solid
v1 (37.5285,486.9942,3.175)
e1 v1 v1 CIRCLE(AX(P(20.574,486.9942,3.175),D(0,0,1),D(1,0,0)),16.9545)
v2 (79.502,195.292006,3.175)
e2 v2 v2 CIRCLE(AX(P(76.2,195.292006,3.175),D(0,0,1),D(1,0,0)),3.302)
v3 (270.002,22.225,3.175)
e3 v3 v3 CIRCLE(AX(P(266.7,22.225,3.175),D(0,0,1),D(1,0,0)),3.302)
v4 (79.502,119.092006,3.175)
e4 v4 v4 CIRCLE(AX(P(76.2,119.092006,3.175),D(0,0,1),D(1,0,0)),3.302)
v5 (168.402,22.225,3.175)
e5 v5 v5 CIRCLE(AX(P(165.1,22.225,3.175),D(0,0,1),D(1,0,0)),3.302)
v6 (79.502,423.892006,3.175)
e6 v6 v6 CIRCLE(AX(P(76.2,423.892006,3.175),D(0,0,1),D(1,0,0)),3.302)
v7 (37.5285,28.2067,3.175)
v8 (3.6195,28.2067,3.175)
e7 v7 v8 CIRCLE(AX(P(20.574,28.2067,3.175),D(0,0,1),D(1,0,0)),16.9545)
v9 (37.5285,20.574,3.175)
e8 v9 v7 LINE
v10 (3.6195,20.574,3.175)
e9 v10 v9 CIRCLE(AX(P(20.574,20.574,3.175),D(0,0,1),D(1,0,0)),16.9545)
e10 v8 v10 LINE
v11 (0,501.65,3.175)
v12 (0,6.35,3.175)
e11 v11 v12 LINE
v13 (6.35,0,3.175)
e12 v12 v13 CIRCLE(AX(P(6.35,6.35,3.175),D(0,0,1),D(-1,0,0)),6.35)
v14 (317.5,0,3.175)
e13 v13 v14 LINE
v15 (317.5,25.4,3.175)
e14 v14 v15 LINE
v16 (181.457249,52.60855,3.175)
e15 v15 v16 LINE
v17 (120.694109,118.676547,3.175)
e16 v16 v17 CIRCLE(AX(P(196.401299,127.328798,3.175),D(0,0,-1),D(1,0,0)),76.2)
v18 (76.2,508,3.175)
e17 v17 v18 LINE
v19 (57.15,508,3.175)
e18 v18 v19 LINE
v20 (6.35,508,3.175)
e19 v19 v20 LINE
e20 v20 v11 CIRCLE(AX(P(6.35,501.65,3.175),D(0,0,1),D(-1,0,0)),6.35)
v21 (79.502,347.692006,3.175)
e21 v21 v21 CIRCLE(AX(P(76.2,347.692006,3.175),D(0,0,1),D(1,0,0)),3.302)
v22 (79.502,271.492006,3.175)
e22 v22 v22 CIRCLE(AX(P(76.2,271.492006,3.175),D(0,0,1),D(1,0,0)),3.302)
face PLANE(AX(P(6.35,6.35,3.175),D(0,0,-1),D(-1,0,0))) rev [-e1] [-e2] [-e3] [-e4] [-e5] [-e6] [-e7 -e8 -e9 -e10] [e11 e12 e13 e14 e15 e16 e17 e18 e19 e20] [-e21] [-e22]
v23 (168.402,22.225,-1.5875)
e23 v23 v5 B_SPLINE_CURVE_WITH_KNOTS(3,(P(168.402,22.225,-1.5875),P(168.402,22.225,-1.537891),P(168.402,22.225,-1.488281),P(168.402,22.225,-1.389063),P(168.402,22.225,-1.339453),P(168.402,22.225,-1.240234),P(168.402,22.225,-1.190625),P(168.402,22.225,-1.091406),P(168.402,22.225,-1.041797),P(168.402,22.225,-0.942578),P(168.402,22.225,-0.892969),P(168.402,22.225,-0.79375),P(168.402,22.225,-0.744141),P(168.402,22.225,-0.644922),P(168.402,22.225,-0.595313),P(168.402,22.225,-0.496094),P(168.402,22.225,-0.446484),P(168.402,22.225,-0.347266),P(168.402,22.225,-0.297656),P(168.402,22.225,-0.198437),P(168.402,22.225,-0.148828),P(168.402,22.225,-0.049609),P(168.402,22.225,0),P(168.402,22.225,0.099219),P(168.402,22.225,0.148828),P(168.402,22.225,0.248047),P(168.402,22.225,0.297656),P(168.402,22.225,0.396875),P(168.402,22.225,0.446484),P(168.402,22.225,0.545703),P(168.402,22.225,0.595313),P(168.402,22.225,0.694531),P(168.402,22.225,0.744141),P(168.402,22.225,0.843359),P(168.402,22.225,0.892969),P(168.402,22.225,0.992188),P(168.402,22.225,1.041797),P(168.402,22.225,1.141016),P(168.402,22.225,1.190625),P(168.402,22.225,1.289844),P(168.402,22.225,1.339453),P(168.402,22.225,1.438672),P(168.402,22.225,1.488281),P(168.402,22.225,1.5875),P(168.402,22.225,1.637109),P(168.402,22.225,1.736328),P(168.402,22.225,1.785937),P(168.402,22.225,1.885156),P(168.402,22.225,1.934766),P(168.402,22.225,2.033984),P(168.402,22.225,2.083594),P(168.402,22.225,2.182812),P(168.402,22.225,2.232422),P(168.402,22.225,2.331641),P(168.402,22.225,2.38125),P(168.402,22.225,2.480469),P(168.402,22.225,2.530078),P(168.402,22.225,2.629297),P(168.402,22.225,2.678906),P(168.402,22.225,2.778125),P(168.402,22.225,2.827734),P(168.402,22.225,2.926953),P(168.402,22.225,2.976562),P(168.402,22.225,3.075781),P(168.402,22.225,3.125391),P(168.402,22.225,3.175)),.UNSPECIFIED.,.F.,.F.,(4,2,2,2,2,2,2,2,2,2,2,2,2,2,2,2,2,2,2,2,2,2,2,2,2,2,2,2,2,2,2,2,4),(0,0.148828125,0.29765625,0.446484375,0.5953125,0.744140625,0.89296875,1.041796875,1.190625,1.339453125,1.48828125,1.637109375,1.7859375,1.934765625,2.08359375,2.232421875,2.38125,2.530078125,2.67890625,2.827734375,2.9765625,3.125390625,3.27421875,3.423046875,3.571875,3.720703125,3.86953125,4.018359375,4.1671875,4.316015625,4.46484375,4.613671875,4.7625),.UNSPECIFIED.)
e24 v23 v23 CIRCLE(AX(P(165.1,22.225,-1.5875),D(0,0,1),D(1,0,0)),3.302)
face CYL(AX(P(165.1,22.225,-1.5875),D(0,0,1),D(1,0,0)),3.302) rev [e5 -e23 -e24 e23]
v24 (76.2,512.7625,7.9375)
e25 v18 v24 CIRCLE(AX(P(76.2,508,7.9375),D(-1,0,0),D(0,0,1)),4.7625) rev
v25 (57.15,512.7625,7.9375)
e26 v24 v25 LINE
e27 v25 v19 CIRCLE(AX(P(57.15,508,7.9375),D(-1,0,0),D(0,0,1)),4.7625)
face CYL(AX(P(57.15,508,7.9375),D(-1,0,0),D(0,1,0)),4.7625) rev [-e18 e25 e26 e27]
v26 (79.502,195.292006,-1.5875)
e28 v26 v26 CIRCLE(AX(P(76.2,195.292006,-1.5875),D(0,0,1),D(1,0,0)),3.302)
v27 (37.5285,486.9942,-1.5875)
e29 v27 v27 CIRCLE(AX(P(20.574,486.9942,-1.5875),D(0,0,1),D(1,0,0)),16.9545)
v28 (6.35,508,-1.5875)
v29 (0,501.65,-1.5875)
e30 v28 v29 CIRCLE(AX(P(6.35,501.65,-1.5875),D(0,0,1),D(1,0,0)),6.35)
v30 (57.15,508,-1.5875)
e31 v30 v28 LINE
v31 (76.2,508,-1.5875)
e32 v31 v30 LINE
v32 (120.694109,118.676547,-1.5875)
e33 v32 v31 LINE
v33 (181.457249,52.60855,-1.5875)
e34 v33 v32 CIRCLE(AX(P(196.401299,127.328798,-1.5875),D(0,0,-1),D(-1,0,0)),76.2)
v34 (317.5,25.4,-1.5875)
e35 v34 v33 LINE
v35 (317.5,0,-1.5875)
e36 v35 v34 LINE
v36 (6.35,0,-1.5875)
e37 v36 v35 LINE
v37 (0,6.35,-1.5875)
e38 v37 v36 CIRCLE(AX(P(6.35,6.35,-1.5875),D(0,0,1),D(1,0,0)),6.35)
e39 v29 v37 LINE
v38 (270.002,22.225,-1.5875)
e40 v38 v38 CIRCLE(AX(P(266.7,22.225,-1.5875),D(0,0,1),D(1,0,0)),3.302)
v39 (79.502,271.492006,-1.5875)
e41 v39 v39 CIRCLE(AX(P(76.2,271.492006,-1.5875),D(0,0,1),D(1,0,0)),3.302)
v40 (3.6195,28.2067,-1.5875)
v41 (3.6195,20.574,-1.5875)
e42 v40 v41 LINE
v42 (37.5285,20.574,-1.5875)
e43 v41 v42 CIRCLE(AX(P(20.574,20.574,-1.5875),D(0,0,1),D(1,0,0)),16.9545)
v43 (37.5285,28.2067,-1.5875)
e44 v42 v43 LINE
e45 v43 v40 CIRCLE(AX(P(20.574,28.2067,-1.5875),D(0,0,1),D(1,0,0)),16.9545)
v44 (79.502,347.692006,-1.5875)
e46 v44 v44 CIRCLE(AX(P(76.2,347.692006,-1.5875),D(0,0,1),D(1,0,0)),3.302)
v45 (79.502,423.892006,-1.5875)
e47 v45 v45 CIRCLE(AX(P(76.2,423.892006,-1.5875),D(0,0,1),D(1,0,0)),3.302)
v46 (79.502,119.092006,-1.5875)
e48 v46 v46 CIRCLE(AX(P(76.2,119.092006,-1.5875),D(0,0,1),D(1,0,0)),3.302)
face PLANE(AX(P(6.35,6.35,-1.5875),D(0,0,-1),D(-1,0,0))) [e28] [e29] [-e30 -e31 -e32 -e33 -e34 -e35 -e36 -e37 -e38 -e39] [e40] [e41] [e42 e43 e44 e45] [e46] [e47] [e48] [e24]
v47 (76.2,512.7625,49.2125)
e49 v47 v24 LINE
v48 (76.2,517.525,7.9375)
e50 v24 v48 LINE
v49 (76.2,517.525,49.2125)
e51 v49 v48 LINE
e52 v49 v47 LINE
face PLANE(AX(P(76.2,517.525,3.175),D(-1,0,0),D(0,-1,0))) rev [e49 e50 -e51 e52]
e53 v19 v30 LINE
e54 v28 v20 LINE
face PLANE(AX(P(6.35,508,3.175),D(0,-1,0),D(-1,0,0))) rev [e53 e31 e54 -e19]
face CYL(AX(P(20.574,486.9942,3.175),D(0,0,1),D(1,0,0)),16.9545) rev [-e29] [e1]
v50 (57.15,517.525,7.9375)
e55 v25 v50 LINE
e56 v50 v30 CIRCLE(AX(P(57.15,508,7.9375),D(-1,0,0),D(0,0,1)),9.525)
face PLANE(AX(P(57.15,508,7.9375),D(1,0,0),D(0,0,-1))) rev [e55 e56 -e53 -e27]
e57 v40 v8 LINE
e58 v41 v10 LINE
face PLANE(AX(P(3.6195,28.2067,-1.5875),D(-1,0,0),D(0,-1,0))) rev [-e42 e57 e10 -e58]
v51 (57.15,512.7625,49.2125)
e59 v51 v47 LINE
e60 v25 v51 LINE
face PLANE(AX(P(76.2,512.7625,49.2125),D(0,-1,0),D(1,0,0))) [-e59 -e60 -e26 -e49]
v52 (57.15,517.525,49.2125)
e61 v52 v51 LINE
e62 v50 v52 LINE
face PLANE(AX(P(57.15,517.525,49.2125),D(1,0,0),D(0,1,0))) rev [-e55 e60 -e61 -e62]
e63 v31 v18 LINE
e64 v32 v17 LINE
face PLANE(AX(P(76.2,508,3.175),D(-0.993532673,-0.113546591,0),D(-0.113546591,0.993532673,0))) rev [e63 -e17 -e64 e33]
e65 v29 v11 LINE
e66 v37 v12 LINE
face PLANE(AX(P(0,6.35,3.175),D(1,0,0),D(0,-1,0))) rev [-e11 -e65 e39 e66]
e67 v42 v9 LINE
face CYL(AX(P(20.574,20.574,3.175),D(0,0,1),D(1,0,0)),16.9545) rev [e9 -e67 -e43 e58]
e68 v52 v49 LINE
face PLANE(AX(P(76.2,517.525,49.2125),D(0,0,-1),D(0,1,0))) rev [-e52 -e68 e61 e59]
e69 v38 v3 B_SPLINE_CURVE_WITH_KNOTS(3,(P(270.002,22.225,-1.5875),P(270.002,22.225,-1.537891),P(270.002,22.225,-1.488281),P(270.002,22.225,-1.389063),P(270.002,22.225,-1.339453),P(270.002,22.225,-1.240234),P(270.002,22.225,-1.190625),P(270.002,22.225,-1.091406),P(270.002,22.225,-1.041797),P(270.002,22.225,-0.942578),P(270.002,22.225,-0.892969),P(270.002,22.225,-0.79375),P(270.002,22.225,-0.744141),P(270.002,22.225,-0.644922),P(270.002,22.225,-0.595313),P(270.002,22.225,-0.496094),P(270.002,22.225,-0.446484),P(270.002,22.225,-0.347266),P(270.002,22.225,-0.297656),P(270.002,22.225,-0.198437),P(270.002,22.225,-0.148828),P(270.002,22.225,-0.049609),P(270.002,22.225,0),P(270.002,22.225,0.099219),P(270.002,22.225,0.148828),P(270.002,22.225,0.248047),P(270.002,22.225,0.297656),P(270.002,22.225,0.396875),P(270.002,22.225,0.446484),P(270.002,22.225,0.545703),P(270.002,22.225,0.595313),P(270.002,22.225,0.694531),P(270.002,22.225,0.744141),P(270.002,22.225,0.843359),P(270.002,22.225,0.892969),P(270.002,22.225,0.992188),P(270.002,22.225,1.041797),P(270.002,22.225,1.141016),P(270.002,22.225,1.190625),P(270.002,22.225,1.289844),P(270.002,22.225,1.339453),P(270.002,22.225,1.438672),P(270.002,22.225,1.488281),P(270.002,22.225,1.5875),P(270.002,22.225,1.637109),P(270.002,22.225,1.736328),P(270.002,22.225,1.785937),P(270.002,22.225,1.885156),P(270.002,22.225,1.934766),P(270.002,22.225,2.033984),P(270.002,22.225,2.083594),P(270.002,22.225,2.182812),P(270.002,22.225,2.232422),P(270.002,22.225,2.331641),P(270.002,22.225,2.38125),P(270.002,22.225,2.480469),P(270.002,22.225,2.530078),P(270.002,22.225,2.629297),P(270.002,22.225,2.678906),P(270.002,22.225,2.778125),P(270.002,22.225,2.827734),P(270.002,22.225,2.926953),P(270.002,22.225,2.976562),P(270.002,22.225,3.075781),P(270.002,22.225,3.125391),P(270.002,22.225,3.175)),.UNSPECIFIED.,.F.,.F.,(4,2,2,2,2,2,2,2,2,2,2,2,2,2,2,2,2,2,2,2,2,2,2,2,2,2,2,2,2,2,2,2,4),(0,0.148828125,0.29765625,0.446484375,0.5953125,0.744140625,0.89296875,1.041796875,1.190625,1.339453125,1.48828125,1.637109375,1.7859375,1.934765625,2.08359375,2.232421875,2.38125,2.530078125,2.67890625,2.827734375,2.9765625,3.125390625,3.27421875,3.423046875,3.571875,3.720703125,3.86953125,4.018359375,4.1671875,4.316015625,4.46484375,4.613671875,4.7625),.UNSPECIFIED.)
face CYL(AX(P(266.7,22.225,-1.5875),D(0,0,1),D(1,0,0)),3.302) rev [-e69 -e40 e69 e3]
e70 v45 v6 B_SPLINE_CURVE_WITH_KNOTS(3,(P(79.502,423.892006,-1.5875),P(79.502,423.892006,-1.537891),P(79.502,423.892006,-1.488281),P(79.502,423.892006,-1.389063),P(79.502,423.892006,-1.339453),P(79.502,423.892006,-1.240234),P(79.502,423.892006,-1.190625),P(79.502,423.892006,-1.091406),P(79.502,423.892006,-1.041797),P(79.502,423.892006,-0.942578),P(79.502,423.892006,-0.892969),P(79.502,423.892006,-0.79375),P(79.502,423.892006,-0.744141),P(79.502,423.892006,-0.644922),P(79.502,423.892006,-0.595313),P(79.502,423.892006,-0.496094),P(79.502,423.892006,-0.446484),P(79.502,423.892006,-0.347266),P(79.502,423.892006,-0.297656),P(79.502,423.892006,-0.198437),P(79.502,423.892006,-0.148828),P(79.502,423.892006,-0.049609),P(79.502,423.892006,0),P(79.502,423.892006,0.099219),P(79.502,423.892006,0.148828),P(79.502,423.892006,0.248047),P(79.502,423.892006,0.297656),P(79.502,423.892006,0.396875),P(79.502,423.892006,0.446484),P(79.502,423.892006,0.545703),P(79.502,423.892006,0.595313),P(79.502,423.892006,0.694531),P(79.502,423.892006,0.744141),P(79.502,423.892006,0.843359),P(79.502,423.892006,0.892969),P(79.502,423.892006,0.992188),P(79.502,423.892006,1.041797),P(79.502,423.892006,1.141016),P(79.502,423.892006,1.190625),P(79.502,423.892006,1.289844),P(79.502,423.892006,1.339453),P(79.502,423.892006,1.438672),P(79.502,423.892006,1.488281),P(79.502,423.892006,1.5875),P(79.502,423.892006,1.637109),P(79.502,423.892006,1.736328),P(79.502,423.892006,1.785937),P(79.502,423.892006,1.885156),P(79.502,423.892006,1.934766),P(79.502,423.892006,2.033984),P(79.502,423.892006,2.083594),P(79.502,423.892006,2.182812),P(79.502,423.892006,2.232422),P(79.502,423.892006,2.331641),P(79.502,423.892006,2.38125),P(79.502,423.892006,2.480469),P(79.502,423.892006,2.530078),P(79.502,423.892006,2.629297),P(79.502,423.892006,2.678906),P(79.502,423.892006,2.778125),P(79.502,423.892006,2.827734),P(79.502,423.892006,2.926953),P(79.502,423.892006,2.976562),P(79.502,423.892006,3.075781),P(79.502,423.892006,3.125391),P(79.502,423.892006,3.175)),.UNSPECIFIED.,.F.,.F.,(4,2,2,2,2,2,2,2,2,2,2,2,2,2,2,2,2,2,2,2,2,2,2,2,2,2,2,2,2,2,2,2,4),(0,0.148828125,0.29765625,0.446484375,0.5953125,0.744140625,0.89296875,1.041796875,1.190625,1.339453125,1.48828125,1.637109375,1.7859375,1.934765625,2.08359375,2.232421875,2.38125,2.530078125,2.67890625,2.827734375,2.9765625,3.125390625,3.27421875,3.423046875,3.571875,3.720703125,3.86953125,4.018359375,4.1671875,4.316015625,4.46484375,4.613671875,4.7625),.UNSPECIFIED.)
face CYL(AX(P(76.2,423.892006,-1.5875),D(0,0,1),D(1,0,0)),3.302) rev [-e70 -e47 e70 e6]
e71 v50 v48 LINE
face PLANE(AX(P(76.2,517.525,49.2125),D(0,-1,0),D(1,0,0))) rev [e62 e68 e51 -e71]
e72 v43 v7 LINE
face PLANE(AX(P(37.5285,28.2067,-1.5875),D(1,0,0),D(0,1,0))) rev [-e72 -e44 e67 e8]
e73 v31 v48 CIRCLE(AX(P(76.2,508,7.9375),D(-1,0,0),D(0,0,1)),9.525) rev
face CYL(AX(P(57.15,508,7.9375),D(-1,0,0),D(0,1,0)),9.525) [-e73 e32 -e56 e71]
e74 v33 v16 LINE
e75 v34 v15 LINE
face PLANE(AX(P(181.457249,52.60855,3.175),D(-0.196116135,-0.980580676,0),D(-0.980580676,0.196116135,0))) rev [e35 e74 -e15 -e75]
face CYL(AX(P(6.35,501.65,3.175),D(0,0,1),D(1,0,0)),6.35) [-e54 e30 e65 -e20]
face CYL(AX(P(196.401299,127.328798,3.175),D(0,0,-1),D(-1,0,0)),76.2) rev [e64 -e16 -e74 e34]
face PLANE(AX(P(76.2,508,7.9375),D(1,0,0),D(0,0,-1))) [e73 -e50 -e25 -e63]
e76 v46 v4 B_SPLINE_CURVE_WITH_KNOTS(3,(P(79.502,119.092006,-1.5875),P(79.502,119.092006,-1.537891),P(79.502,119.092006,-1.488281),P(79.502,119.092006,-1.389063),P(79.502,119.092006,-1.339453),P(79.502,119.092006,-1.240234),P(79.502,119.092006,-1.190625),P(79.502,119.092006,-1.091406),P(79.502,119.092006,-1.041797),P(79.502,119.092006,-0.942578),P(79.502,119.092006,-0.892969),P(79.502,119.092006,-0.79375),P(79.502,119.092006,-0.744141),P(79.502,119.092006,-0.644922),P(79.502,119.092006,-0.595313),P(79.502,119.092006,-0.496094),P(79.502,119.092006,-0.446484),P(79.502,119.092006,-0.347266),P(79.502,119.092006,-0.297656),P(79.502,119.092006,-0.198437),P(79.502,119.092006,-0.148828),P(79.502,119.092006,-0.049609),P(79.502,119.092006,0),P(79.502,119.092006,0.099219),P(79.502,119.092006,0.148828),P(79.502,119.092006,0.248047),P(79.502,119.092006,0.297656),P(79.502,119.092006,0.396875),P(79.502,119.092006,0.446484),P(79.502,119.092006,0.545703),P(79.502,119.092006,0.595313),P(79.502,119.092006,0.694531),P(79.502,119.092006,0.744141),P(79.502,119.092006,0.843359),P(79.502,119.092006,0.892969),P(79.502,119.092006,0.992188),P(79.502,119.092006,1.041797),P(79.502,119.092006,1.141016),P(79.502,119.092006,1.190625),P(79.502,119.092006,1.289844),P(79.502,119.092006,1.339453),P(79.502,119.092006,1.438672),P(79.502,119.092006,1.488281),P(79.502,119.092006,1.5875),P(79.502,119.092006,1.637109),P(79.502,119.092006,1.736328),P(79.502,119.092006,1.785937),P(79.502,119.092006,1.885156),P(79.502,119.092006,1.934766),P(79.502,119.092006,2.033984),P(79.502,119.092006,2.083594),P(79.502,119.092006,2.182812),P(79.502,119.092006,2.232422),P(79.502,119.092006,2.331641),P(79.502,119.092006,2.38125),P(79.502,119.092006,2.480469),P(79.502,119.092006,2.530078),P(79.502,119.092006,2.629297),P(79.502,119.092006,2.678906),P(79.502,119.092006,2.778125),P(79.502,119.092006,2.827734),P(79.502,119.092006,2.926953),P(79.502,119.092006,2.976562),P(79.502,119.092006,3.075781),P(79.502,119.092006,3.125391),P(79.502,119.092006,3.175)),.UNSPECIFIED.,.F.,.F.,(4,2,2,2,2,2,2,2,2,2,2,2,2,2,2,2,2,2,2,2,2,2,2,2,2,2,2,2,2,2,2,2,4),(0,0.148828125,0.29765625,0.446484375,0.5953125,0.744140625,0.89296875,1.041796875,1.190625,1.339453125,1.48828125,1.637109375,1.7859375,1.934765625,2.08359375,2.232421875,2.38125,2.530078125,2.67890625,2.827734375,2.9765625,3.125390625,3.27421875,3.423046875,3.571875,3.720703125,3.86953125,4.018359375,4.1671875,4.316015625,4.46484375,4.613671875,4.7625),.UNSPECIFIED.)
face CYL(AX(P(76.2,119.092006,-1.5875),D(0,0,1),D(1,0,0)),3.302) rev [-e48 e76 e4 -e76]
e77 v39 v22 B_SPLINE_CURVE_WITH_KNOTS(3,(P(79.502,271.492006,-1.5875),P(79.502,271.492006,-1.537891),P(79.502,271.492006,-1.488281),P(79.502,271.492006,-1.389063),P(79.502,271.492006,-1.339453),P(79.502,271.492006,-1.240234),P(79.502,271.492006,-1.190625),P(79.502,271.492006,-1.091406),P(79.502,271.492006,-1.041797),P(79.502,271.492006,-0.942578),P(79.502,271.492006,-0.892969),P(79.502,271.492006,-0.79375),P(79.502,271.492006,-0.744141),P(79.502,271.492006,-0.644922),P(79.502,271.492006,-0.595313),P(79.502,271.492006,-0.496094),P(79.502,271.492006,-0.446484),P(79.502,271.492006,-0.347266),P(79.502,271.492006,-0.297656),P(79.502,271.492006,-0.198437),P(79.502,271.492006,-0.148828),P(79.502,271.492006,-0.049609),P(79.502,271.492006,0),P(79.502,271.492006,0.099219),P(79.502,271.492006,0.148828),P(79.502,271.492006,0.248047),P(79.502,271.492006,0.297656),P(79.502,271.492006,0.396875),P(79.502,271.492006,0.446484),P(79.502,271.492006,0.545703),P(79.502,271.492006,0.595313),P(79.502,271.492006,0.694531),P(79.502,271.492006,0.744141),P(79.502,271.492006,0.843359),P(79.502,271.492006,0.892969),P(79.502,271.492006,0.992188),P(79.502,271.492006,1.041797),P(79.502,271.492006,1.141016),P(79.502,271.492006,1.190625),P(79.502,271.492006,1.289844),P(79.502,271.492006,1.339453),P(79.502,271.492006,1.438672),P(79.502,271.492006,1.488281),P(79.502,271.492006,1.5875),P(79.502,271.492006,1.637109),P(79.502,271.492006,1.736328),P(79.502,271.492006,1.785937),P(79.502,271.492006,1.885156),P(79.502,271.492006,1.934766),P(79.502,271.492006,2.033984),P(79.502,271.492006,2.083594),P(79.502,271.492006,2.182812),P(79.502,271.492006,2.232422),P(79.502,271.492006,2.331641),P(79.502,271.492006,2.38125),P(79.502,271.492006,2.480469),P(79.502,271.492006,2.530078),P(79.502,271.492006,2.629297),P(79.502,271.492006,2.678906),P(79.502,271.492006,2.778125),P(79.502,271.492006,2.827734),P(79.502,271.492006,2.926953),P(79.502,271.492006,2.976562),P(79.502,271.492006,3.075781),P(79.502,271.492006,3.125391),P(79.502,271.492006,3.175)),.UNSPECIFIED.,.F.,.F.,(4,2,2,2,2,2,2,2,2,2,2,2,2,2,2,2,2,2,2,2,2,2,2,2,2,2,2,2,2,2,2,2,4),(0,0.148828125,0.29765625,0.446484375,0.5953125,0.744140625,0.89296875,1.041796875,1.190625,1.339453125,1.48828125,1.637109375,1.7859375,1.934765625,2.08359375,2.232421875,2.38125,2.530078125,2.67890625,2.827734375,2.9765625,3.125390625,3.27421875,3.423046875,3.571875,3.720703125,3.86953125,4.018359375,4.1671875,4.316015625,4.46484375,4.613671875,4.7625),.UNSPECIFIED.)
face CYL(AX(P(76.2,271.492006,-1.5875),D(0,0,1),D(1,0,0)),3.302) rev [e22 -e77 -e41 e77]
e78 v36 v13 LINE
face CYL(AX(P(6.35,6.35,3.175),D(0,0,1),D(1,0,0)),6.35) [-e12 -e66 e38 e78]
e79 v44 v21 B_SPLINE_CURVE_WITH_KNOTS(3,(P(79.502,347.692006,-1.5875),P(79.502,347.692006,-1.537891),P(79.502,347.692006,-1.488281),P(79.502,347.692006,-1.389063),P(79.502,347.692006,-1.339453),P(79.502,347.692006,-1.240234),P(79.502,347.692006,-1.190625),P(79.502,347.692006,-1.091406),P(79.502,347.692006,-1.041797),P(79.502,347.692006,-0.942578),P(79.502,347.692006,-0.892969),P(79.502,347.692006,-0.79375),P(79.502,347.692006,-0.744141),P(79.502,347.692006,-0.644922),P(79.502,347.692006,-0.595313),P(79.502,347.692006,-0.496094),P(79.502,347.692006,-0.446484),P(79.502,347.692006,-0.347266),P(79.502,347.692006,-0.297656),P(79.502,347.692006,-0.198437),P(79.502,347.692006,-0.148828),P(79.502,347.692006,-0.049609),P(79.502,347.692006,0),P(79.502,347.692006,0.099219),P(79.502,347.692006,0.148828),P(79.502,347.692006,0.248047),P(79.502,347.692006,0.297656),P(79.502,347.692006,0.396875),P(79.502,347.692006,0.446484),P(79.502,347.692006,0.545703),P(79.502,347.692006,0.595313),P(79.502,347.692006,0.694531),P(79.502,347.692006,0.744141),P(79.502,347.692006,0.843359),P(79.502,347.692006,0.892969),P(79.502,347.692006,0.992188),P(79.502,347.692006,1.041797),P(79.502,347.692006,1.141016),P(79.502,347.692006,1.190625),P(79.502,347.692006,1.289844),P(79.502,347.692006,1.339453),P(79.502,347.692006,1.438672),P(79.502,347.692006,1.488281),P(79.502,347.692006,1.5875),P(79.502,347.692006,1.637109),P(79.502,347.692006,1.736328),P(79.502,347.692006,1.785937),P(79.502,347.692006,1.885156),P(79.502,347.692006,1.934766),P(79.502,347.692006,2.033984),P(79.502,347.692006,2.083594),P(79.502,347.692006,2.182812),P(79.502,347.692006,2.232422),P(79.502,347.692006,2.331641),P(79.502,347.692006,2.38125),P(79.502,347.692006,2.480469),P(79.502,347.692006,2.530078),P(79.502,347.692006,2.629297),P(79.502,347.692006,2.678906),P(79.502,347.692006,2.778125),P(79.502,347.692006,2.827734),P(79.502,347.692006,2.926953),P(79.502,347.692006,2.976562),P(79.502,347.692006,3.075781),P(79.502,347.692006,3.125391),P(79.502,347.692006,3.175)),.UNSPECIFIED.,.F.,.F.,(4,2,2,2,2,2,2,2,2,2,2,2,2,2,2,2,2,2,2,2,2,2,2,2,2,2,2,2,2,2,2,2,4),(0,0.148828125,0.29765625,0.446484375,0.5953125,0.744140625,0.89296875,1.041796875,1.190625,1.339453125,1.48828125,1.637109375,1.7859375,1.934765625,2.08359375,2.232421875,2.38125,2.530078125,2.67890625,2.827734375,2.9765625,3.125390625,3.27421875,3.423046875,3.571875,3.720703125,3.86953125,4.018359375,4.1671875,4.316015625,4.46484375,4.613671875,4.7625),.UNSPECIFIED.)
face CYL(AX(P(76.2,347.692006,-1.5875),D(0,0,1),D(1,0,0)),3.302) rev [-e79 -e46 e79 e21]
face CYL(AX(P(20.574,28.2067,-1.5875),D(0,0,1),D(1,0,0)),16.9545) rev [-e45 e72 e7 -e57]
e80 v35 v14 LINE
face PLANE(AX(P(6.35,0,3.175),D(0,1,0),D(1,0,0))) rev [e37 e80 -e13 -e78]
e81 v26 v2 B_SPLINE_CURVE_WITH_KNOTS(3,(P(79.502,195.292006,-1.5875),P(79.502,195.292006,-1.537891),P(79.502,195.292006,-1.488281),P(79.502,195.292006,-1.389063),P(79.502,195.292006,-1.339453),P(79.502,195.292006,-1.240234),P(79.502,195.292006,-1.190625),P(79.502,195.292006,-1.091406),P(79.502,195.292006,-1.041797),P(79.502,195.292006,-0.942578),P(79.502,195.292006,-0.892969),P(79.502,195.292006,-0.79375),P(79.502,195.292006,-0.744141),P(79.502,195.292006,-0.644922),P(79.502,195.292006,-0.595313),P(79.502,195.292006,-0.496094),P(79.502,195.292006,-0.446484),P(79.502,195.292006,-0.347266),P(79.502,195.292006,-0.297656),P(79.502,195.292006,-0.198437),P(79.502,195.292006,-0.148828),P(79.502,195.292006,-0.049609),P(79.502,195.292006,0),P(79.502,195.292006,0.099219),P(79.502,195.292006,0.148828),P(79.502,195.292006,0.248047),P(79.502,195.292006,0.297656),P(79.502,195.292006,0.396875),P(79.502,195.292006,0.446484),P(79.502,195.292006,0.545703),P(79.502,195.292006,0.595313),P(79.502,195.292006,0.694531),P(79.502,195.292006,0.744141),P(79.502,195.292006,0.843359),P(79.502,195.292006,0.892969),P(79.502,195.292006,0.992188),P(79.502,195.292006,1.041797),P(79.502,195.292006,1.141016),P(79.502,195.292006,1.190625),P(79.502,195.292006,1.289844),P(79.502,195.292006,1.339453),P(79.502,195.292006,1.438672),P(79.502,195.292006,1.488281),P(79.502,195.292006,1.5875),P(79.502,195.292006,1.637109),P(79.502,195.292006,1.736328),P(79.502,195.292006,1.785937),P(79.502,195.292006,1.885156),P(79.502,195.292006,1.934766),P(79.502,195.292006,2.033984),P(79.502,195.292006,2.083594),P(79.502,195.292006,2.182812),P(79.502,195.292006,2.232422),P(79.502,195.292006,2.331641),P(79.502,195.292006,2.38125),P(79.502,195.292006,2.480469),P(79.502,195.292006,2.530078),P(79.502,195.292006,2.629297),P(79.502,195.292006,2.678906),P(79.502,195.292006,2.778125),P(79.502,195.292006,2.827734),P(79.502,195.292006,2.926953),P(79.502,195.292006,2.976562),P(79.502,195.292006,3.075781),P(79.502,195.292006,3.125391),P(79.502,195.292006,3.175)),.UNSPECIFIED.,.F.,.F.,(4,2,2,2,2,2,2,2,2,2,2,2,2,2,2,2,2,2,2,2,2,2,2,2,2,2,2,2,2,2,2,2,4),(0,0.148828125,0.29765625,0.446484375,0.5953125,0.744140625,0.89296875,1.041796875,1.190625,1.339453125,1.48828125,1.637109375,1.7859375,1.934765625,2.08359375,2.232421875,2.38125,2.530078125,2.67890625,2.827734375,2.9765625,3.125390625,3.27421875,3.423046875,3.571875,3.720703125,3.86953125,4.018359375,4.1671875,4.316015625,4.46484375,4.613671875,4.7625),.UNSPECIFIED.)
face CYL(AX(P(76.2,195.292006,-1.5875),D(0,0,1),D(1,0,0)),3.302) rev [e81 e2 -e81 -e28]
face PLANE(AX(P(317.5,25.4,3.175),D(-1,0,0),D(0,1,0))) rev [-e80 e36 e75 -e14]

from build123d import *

# Parameters (mm, degrees)
BOSS_EXTRUDE1_DEPTH      = 3.175
SKETCH2_R                = 16.9545
CUT_EXTRUDE1_DEPTH       = 600.06621556
CONVERT_SOLID1_START     = -1.5875
CONVERT_SOLID1_OUTLINE_R = 16.9545
CONVERT_SOLID1_DEPTH     = 1.5875
EDGE_FLANGE3_DEPTH       = 19.05
SKETCH17_R               = 3.302
CUT_EXTRUDE4_DEPTH       = 609.89886437
CUT_EXTRUDE5_DEPTH       = 609.89886437
SKETCH19_R               = 3.302
CUT_EXTRUDE6_DEPTH       = 610.147146247


# Read off the part's stored shape, not the designer's step: Convert-Solid1
# Sheet-metal steps are written as plain solids
with BuildPart() as part:
    # Sketch1 → Boss-Extrude1 (new body)
    with BuildSketch(Plane.XY):
        with BuildLine():
            Line((6.35, 0), (317.5, 0))
            Line((317.5, 0), (317.5, 25.4))
            Line((317.5, 25.4), (181.457249023, 52.608550195))
            ThreePointArc((181.457249023, 52.608550195), (140.315142877, 75.746018143), (120.694108864, 118.676547437))
            Line((120.694108864, 118.676547437), (76.2, 508))
            Line((76.2, 508), (6.35, 508))
            ThreePointArc((6.35, 508), (1.859871939, 506.140128061), (0, 501.65))
            Line((0, 501.65), (0, 6.35))
            ThreePointArc((0, 6.35), (1.859871939, 1.859871939), (6.35, 0))
        make_face()
    extrude(amount=BOSS_EXTRUDE1_DEPTH)

    # Sketch2 → Cut-Extrude1 (cut, through all)
    with BuildSketch(Plane.XY.offset(3.175)):
        with Locations((20.574, 486.9942)):
            Circle(SKETCH2_R)
        with Locations((20.574, 20.574)):
            Circle(SKETCH2_R)
    extrude(amount=-CUT_EXTRUDE1_DEPTH, mode=Mode.SUBTRACT)

    # Convert-Solid1 outline → Convert-Solid1 (add)
    with BuildSketch(Plane.XY.offset(CONVERT_SOLID1_START)):
        with BuildLine():
            Line((317.5, 25.4), (181.457249023, 52.608550195))
            ThreePointArc((181.457249023, 52.608550195), (140.315142877, 75.746018143), (120.694108864, 118.676547437))
            Line((120.694108864, 118.676547437), (76.2, 508))
            Line((76.2, 508), (6.35, 508))
            ThreePointArc((6.35, 508), (1.859871939, 506.140128061), (0, 501.65))
            Line((0, 501.65), (0, 6.35))
            ThreePointArc((0, 6.35), (1.859871939, 1.859871939), (6.35, 0))
            Line((6.35, 0), (317.5, 0))
            Line((317.5, 0), (317.5, 25.4))
        make_face()
        with Locations((20.574, 20.574)):
            Circle(CONVERT_SOLID1_OUTLINE_R, mode=Mode.SUBTRACT)
        with Locations((20.574, 486.9942)):
            Circle(CONVERT_SOLID1_OUTLINE_R, mode=Mode.SUBTRACT)
    extrude(amount=CONVERT_SOLID1_DEPTH)

    # Edge-Flange3 section (across the edge) → Edge-Flange3 (add)
    with BuildSketch(Plane(origin=(76.2, 512.7625, 3.175), x_dir=(0, -1, 0), z_dir=(-1, 0, 0))):
        with BuildLine():
            Line((-4.7625, 4.7625), (-4.7625, 46.0375))
            Line((-4.7625, 46.0375), (0, 46.0375))
            Line((0, 46.0375), (0, 4.7625))
            ThreePointArc((0, 4.7625), (1.394903955, 1.394903955), (4.7625, 0))
            Line((4.7625, 0), (4.7625, -4.7625))
            ThreePointArc((4.7625, -4.7625), (-1.972692091, -1.972692091), (-4.7625, 4.7625))
        make_face()
    extrude(amount=EDGE_FLANGE3_DEPTH)

    # Sketch17 → Cut-Extrude4 (cut, through all)
    with BuildSketch(Plane.XY.offset(3.175)):
        with Locations((76.2, 423.892006342)):
            Circle(SKETCH17_R)
        with Locations((76.2, 347.692006342)):
            Circle(SKETCH17_R)
        with Locations((76.2, 271.492006342)):
            Circle(SKETCH17_R)
        with Locations((76.2, 195.292006342)):
            Circle(SKETCH17_R)
        with Locations((76.2, 119.092006342)):
            Circle(SKETCH17_R)
        with Locations((266.7, 22.225)):
            Circle(SKETCH17_R)
        with Locations((165.1, 22.225)):
            Circle(SKETCH17_R)
    extrude(amount=-CUT_EXTRUDE4_DEPTH, mode=Mode.SUBTRACT)

    # Sketch18 → Cut-Extrude5 (cut, through all)
    with BuildSketch(Plane.XY.offset(3.175)):
        with BuildLine():
            Line((3.6195, 28.2067), (3.6195, 20.574))
            ThreePointArc((3.6195, 20.574), (20.574, 3.6195), (37.5285, 20.574))
            Line((37.5285, 20.574), (37.5285, 28.2067))
            ThreePointArc((37.5285, 28.2067), (20.574, 45.1612), (3.6195, 28.2067))
        make_face()
    extrude(amount=-CUT_EXTRUDE5_DEPTH, mode=Mode.SUBTRACT)

    # Sketch19 → Cut-Extrude6 (cut, through all)
    with BuildSketch(Plane(origin=(0, 517.525, 0), x_dir=(0, 0, -1), z_dir=(0, 1, 0))):
        with Locations((-28.575, -82.55)):
            Circle(SKETCH19_R)
        with Locations((-28.575, -50.8)):
            Circle(SKETCH19_R)
    extrude(amount=-CUT_EXTRUDE6_DEPTH, mode=Mode.SUBTRACT)


solid = part.part
